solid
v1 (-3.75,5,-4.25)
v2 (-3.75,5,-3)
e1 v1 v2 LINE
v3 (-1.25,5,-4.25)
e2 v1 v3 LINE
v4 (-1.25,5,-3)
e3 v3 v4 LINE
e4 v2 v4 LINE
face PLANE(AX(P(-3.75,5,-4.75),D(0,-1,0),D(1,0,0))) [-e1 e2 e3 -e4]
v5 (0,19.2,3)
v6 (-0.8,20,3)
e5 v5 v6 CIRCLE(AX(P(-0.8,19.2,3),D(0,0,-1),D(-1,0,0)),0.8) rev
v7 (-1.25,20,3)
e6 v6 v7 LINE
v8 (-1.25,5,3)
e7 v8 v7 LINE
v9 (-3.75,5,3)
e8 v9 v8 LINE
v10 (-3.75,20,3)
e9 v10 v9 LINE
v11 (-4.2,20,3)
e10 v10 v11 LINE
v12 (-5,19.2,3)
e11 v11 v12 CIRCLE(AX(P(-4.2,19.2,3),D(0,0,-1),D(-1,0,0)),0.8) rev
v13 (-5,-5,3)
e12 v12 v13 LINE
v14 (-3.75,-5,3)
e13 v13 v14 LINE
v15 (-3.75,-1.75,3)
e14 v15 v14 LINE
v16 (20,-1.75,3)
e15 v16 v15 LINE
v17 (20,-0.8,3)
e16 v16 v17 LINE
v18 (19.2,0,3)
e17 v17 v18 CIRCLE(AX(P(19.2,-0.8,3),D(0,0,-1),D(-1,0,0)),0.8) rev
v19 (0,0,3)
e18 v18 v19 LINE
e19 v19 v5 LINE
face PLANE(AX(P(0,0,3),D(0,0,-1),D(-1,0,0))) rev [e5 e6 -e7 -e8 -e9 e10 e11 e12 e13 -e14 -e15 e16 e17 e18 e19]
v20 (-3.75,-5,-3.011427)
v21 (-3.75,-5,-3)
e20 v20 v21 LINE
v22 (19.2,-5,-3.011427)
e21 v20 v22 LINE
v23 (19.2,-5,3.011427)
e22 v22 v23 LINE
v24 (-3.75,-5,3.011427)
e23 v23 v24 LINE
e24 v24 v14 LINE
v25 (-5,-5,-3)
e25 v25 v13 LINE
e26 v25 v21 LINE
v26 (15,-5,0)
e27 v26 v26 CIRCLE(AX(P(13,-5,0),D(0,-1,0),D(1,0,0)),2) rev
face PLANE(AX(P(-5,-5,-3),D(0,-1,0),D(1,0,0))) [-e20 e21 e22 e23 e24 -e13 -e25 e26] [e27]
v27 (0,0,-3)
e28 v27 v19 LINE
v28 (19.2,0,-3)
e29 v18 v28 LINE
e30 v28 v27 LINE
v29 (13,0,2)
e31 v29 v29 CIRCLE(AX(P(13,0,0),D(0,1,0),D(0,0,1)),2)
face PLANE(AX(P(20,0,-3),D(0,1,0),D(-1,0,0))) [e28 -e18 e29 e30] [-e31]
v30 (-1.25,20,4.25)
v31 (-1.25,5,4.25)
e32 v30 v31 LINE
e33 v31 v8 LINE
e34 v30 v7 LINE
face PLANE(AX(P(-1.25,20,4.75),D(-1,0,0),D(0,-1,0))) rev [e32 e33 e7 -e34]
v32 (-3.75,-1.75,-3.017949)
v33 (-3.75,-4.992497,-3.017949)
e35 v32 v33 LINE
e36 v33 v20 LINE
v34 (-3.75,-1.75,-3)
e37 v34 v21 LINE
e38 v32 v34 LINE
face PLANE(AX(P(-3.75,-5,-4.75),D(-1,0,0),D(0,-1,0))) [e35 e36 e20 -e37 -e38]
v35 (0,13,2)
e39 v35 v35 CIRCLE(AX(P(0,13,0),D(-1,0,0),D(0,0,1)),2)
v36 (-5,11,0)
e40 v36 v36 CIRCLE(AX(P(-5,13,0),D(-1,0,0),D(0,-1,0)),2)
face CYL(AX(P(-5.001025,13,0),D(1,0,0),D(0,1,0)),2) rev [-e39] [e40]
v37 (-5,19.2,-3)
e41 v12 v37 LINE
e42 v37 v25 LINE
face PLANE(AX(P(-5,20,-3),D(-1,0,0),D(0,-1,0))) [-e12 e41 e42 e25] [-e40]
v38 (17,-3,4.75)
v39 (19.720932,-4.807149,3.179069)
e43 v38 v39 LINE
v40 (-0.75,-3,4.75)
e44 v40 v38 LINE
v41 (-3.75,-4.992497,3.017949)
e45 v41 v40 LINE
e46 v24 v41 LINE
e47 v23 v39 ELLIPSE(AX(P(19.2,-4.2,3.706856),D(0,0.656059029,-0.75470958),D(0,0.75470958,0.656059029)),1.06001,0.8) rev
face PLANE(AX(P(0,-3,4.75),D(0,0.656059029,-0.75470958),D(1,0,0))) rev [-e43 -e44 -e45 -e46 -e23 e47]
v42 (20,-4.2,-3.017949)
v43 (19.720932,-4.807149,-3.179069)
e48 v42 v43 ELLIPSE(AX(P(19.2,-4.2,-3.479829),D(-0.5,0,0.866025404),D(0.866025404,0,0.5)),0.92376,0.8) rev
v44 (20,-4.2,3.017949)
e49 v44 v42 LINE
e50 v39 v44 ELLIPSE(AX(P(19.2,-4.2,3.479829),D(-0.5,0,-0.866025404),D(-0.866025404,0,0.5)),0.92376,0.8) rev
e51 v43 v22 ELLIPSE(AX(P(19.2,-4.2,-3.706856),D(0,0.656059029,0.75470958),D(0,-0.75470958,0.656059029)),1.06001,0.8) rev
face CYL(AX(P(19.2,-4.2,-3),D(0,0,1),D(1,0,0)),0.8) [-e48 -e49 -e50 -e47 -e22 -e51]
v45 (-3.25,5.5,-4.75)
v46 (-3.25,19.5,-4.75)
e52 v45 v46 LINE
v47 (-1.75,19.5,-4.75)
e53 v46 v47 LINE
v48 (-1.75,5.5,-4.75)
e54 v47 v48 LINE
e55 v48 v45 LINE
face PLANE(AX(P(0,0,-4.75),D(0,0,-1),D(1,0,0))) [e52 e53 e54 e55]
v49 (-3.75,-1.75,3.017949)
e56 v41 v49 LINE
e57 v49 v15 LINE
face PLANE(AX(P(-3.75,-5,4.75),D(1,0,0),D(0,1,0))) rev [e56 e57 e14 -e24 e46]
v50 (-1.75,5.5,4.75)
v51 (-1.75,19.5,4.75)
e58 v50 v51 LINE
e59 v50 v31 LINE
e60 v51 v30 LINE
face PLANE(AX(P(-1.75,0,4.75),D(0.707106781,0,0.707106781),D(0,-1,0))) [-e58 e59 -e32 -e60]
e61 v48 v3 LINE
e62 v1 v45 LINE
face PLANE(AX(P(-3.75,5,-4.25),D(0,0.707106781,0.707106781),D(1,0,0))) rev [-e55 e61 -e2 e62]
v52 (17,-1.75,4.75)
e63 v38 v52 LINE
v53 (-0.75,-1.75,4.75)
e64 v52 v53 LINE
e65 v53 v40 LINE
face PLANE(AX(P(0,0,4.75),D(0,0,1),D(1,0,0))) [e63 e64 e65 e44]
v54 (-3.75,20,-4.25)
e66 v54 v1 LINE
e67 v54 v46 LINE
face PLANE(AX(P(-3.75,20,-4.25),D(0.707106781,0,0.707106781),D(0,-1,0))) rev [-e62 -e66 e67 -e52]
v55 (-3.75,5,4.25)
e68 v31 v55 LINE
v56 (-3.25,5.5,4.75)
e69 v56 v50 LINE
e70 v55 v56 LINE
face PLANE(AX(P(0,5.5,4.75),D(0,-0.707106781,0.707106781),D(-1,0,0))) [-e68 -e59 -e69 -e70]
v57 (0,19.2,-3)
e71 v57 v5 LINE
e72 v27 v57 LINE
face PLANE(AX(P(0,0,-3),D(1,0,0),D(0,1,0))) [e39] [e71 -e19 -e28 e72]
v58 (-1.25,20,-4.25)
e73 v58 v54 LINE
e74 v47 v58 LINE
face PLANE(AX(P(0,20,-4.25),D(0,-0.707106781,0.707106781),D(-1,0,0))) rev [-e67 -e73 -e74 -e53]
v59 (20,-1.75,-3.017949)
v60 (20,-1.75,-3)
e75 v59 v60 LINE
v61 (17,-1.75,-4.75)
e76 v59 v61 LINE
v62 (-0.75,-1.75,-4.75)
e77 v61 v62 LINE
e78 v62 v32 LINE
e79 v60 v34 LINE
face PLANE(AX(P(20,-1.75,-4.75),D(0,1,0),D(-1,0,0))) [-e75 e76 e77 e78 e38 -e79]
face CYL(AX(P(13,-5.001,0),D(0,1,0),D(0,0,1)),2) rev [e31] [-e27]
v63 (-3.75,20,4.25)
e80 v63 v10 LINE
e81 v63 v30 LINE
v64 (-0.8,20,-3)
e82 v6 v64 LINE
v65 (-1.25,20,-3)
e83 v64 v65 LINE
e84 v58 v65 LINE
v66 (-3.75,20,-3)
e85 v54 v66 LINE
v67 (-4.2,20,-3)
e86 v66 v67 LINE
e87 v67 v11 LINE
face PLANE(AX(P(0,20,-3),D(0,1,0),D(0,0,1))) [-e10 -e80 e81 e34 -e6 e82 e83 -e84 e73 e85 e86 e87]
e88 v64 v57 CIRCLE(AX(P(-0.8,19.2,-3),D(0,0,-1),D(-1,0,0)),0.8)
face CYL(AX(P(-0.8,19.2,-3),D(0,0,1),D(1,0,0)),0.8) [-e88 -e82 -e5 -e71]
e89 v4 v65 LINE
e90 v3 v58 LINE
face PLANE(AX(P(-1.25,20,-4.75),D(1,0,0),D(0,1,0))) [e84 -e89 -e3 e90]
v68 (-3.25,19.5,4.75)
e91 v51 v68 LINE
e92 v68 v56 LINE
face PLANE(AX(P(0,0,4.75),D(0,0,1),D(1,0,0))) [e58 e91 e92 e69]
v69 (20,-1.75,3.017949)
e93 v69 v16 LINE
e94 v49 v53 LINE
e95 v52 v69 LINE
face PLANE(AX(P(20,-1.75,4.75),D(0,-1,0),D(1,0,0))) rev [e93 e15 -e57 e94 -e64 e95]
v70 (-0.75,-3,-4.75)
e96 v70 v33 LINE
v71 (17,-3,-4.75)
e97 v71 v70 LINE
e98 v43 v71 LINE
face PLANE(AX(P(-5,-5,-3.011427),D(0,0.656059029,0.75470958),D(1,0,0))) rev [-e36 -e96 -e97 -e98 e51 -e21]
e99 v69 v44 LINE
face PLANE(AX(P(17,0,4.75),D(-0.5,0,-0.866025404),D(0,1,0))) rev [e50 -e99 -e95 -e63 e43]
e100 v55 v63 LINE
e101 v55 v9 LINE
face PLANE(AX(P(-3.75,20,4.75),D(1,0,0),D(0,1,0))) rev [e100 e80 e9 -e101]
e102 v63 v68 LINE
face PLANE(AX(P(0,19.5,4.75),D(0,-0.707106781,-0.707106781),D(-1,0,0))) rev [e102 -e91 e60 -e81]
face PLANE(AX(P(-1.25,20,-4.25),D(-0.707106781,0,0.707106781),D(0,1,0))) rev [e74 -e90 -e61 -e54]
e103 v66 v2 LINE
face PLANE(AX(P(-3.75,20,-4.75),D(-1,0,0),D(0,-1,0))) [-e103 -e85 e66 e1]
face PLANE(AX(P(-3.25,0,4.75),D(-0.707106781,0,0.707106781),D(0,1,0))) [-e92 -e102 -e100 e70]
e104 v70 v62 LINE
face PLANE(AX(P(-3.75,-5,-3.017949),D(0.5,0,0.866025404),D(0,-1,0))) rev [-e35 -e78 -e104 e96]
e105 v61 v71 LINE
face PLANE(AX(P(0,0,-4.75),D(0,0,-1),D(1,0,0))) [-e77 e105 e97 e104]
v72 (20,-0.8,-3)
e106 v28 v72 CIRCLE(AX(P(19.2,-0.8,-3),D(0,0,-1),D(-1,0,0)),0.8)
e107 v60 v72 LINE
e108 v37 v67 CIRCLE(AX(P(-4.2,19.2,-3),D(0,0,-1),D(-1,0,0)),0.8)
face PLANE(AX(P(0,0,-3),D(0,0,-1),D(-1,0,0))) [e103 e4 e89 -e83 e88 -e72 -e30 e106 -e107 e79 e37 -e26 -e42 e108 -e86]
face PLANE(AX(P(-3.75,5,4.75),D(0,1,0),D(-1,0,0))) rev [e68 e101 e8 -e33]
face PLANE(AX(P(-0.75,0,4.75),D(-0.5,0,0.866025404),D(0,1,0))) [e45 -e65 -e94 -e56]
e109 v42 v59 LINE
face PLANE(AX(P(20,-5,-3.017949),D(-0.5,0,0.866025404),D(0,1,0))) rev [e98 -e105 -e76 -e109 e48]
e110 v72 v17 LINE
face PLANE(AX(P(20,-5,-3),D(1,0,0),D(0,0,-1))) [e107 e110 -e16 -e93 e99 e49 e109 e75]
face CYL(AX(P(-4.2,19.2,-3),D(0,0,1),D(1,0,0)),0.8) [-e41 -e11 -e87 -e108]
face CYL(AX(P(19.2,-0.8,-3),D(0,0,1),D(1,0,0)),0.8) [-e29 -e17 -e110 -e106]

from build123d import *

# Parameters (mm, degrees)
EXTRUDE1_DEPTH      = 3
EXTRUDE1_DEPTH_BACK = 3
SKETCH2_W           = 2.5
SKETCH2_H           = 15
SKETCH2_W_2         = 23.75
SKETCH2_H_2         = 3.25
EXTRUDE2_DEPTH      = 1.75
CHAMFER1_SIZE       = 3
CHAMFER1_SIZE2      = 1.732050808
CHAMFER2_SIZE       = 2
CHAMFER2_SIZE2      = 1.738573476
CHAMFER3_SIZE       = 0.5
EXTRUDE3_REACH      = 30.68
SKETCH4_R           = 2
FILLET1_R           = 0.8


# Read off the part's stored shape, not the designer's step: Mirror1
with BuildPart() as part:
    # Sketch1 → Extrude1 (new, two sides: drawn at the far end of the back side and taken through both)
    with BuildSketch(Plane.XY.offset(-EXTRUDE1_DEPTH_BACK)):
        Polygon((0, 0), (0, 20), (-5, 20), (-5, -5), (20, -5), (20, 0), align=None)
    extrude(amount=EXTRUDE1_DEPTH + EXTRUDE1_DEPTH_BACK)

    # Sketch2 → Extrude2 (add)
    with BuildSketch(Plane.XY.offset(3)):
        with Locations((-2.5, 12.5)):
            Rectangle(SKETCH2_W, SKETCH2_H)
        with Locations((8.125, -3.375)):
            Rectangle(SKETCH2_W_2, SKETCH2_H_2)
    extrude(amount=EXTRUDE2_DEPTH)

    # Chamfer1
    chamfer1_edges = [part.edges().sort_by_distance(p)[0] for p in [
        (20, -3.375, 4.75),
        (-3.75, -3.375, 4.75),
    ]]
    chamfer1_side = [part.faces().sort_by_distance(p)[0] for p in [
        (8.125, -3.375, 4.75),
    ]]
    chamfer(chamfer1_edges, length=CHAMFER1_SIZE, length2=CHAMFER1_SIZE2, reference=chamfer1_side[0])

    # Chamfer2
    chamfer2_edges = [part.edges().sort_by_distance(p)[0] for p in [
        (8.125, -5, 4.75),
    ]]
    chamfer2_side = [part.faces().sort_by_distance(p)[0] for p in [
        (8.125, -3.375, 4.75),
    ]]
    chamfer(chamfer2_edges, length=CHAMFER2_SIZE, length2=CHAMFER2_SIZE2, reference=chamfer2_side[0])

    # Chamfer3
    chamfer3_edges = [part.edges().sort_by_distance(p)[0] for p in [
        (-2.5, 20, 4.75),
        (-1.25, 12.5, 4.75),
        (-2.5, 5, 4.75),
        (-3.75, 12.5, 4.75),
    ]]
    chamfer(chamfer3_edges, length=CHAMFER3_SIZE)

    # Mirror1: part across plane


with BuildPart() as part_1:
    add(part.part)
    add(part.part.mirror(Plane.XY))

    # Sketch4 → Extrude3 (cut, up to next)
    with BuildSketch(Plane(origin=(0, 0, 0), x_dir=(1, 0, 0), z_dir=(0, 1, 0)), mode=Mode.PRIVATE) as extrude3_sk1:
        with Locations(Location((13, 0, 0), (0, 0, 270))):
            Circle(SKETCH4_R)
    extrude3_tool1 = extrude(extrude3_sk1.sketch, amount=-EXTRUDE3_REACH, mode=Mode.PRIVATE) & part_1.part
    extrude3 = extrude3_tool1.solids().sort_by_distance((13, 0, 0))[0]
    add(extrude3, mode=Mode.SUBTRACT)

    # Mirror2: Extrude3 across plane
    add(extrude3.mirror(Plane(origin=(0, 0, 0), x_dir=(0, 0, 1), z_dir=(0.7071067811865476, -0.7071067811865475, 0))), mode=Mode.SUBTRACT)

    # Fillet1
    fillet1_edges = [part_1.edges().sort_by_distance(p)[0] for p in [
        (-5, 20, 0),
        (20, -5, 0),
        (20, 0, 0),
        (0, 20, 0),
    ]]
    fillet(fillet1_edges, radius=FILLET1_R)


solid = part_1.part
